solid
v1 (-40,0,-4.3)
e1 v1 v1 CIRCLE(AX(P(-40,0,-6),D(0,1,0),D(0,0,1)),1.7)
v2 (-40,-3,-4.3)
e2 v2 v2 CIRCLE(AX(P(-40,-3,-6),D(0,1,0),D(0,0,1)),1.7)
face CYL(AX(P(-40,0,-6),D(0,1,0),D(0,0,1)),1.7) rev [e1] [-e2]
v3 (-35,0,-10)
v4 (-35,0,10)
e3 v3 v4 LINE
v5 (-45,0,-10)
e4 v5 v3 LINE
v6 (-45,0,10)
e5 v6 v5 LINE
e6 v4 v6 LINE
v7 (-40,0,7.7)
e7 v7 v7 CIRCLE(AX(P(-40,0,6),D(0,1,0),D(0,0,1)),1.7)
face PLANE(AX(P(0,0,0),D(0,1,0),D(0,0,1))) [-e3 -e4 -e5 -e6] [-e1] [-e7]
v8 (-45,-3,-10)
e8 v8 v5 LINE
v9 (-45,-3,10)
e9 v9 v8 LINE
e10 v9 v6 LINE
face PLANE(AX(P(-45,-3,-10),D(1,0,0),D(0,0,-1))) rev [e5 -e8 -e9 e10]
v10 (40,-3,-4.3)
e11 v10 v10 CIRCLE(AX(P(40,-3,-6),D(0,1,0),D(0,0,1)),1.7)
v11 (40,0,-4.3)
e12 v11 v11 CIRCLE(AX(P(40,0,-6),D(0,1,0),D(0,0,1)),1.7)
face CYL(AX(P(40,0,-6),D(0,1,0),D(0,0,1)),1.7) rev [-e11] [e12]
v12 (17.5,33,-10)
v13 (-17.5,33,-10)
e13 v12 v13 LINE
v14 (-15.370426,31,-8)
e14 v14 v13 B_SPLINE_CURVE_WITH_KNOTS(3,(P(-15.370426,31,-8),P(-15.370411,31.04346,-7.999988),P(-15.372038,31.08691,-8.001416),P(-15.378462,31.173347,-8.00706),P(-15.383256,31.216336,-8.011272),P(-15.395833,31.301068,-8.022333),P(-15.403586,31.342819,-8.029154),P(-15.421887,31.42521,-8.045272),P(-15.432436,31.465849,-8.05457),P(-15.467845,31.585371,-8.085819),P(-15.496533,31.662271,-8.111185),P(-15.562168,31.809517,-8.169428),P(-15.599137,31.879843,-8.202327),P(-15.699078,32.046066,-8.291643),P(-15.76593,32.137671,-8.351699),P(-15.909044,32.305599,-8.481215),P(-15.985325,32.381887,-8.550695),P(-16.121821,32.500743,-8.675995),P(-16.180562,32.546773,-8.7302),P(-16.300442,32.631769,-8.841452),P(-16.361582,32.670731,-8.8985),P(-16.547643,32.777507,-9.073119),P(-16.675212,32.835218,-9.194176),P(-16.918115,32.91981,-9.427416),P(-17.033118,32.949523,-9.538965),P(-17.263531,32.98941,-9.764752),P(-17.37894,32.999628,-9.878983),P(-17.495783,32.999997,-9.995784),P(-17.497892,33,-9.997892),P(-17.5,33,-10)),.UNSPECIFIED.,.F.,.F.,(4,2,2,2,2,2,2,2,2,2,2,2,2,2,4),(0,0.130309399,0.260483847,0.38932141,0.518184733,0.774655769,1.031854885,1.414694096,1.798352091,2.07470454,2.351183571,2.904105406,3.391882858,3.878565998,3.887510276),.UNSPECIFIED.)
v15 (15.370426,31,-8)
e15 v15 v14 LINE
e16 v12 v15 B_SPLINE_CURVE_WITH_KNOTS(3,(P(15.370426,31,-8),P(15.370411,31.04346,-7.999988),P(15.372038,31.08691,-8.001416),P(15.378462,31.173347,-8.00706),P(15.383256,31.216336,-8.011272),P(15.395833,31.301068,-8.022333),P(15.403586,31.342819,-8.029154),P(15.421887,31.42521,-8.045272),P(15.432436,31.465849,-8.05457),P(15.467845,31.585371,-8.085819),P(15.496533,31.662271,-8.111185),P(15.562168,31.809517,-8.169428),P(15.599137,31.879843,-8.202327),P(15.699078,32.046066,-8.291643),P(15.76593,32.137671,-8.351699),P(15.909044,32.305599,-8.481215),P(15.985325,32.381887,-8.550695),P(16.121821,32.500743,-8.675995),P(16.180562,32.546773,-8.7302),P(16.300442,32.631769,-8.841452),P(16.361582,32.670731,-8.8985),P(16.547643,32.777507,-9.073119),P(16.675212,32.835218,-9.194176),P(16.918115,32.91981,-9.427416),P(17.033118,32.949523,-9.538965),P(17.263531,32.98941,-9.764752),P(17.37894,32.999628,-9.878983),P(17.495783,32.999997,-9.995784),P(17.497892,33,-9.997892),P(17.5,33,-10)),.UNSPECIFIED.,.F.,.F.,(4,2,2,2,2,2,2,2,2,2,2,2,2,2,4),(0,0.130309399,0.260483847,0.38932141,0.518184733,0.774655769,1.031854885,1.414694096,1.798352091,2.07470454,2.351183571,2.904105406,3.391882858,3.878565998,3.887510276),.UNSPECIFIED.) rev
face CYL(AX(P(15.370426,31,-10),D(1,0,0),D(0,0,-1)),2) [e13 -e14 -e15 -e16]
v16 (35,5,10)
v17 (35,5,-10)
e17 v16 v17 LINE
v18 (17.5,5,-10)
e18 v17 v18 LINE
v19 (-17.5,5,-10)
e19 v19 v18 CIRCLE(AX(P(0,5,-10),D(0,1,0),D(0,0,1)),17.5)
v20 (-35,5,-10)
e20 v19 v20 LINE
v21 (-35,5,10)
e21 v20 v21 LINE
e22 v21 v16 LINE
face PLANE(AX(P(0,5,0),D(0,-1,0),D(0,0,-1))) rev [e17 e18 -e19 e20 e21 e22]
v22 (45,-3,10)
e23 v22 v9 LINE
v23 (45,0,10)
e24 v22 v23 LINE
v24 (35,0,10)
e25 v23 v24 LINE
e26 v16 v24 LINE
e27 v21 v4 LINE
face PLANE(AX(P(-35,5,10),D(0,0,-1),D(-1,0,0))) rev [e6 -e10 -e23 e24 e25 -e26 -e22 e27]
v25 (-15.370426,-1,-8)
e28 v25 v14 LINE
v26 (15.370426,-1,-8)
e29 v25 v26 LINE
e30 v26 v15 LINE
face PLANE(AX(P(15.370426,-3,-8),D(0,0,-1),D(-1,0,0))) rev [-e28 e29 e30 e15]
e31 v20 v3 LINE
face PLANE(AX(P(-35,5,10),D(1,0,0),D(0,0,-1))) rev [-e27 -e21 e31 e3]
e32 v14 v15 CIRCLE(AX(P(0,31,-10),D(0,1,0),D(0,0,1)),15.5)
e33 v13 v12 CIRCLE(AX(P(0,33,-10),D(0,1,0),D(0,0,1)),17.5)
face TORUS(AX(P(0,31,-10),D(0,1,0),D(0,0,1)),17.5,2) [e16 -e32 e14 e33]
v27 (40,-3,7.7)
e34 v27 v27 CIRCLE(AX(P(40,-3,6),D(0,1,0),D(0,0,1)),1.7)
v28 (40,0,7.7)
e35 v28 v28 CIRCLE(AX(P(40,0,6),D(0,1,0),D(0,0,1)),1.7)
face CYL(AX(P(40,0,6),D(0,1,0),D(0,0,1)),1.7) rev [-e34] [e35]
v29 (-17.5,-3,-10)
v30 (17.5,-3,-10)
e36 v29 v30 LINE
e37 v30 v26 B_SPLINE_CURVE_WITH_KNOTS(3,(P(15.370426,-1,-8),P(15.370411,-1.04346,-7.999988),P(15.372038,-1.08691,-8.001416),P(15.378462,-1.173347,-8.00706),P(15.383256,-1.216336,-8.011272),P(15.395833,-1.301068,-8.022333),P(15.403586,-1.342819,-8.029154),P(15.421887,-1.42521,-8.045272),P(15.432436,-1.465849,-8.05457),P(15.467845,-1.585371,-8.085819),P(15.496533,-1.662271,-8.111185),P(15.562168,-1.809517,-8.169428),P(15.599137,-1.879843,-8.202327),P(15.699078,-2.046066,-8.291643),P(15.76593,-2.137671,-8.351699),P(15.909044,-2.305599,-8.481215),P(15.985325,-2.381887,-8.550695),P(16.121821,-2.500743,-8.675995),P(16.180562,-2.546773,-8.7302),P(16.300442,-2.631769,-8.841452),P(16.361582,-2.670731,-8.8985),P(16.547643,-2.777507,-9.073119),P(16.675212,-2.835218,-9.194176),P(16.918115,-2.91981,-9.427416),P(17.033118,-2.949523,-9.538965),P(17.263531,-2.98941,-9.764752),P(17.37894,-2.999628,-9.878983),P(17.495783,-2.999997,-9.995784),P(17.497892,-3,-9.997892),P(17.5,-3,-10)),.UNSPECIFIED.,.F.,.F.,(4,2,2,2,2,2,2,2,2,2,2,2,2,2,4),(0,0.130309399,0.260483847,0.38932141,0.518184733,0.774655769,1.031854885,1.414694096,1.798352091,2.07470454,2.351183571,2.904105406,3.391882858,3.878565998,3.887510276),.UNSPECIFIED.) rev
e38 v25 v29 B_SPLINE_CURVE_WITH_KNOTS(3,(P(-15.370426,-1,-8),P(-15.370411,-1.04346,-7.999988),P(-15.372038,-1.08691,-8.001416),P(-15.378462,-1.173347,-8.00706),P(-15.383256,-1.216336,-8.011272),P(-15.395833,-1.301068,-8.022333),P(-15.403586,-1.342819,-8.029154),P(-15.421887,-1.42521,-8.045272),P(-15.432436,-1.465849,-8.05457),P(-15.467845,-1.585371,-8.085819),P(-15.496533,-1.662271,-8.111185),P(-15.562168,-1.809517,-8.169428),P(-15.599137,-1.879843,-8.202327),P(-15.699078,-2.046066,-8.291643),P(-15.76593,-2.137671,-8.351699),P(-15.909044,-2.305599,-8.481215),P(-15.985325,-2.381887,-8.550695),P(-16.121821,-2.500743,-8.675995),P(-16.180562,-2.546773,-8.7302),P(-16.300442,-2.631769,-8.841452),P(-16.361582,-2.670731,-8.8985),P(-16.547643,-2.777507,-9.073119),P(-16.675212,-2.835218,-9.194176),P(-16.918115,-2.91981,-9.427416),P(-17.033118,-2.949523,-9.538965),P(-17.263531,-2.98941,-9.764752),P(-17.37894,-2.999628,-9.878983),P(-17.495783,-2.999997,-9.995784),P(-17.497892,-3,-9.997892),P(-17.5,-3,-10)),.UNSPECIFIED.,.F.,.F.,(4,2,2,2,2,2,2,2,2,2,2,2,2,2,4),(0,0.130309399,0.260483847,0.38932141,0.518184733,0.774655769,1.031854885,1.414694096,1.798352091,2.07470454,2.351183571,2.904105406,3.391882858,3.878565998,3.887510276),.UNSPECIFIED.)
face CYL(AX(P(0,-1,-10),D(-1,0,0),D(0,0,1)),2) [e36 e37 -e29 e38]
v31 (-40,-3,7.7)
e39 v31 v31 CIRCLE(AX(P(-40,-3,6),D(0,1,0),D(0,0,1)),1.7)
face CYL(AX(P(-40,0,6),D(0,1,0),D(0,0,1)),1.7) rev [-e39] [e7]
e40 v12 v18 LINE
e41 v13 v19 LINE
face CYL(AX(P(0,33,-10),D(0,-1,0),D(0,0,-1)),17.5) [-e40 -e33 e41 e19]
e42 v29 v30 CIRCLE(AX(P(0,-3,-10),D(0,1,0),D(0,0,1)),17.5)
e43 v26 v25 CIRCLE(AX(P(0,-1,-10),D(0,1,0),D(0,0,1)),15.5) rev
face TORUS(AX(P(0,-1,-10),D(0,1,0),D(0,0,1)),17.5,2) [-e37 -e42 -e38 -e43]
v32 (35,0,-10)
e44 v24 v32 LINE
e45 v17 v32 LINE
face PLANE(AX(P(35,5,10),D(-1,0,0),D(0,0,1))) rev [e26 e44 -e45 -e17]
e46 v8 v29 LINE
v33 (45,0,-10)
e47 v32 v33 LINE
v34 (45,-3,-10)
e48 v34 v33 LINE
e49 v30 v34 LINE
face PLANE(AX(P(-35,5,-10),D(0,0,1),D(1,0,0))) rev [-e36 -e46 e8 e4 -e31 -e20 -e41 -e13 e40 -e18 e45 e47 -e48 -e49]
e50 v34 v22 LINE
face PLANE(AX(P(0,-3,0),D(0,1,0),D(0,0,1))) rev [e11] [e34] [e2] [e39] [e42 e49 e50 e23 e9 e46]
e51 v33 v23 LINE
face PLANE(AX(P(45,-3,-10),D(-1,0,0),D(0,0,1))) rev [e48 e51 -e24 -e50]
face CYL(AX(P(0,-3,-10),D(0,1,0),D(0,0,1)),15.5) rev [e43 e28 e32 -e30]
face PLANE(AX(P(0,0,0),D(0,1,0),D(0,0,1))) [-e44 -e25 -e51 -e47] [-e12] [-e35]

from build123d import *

# Parameters (mm, degrees)
SKETCH1_W                = 70
SKETCH1_H                = 20
BOSS_EXTRUDE1_DEPTH      = 5
SKETCH2_W                = 90
SKETCH2_H                = 20
BOSS_EXTRUDE2_DEPTH      = 3
BOSS_EXTRUDE3_DEPTH      = 28
CUT_EXTRUDE1_DEPTH       = 59.489315264
FILLET1_R                = 2
FILLET2_R                = 2
M3_CLEARANCE_HOLE1_D     = 3.4
M3_CLEARANCE_HOLE1_DEPTH = 10
M3_CLEARANCE_HOLE1_TIP   = 1.021463052


with BuildPart() as part:
    # Sketch1 → Boss-Extrude1 (new body)
    with BuildSketch(Plane(origin=(0, 0, 0), x_dir=(1, 0, 0), z_dir=(0, 1, 0))):
        Rectangle(SKETCH1_W, SKETCH1_H)
    extrude(amount=BOSS_EXTRUDE1_DEPTH)

    # Sketch2 → Boss-Extrude2 (add)
    with BuildSketch(Plane.XZ):
        Rectangle(SKETCH2_W, SKETCH2_H)
    extrude(amount=BOSS_EXTRUDE2_DEPTH)

    # Sketch4 → Boss-Extrude3 (add)
    with BuildSketch(Plane(origin=(0, 5, 0), x_dir=(1, 0, 0), z_dir=(0, 1, 0))):
        with BuildLine():
            Line((17.5, 10), (-17.5, 10))
            ThreePointArc((-17.5, 10), (0, -7.5), (17.5, 10))
        make_face()
    extrude(amount=BOSS_EXTRUDE3_DEPTH)

    # Sketch6 → Cut-Extrude1 (cut, through all)
    with BuildSketch(Plane(origin=(0, 33, 0), x_dir=(1, 0, 0), z_dir=(0, 1, 0))):
        with BuildLine():
            Line((15.370426149, 8), (-15.370426149, 8))
            ThreePointArc((-15.370426149, 8), (0, -5.5), (15.370426149, 8))
        make_face()
    extrude(amount=-CUT_EXTRUDE1_DEPTH, mode=Mode.SUBTRACT)

    # Fillet1
    fillet1_edges = [part.edges().sort_by_distance(p)[0] for p in [
        (0, 33, 5.5),
        (0, 33, -8),
    ]]
    fillet(fillet1_edges, radius=FILLET1_R - 0.0001)  # a hair under: the kernel refuses the full size

    # Fillet2
    fillet2_edges = [part.edges().sort_by_distance(p)[0] for p in [
        (0, -3, 5.5),
        (0, -3, -8),
    ]]
    fillet(fillet2_edges, radius=FILLET2_R - 0.0001)  # a hair under: the kernel refuses the full size

    # M3 Clearance Hole1
    with Locations(Plane(origin=(0, 0, 0), x_dir=(1, 0, 0), z_dir=(0, 1, 0))):
        with Locations((-40, 6), (-40, -6), (40, 6), (40, -6)):
            Hole(M3_CLEARANCE_HOLE1_D / 2, depth=M3_CLEARANCE_HOLE1_DEPTH)
            with Locations((0, 0, -(M3_CLEARANCE_HOLE1_DEPTH + M3_CLEARANCE_HOLE1_TIP / 2))):  # 118° drill point
                Cone(0, M3_CLEARANCE_HOLE1_D / 2, M3_CLEARANCE_HOLE1_TIP, mode=Mode.SUBTRACT)


solid = part.part
